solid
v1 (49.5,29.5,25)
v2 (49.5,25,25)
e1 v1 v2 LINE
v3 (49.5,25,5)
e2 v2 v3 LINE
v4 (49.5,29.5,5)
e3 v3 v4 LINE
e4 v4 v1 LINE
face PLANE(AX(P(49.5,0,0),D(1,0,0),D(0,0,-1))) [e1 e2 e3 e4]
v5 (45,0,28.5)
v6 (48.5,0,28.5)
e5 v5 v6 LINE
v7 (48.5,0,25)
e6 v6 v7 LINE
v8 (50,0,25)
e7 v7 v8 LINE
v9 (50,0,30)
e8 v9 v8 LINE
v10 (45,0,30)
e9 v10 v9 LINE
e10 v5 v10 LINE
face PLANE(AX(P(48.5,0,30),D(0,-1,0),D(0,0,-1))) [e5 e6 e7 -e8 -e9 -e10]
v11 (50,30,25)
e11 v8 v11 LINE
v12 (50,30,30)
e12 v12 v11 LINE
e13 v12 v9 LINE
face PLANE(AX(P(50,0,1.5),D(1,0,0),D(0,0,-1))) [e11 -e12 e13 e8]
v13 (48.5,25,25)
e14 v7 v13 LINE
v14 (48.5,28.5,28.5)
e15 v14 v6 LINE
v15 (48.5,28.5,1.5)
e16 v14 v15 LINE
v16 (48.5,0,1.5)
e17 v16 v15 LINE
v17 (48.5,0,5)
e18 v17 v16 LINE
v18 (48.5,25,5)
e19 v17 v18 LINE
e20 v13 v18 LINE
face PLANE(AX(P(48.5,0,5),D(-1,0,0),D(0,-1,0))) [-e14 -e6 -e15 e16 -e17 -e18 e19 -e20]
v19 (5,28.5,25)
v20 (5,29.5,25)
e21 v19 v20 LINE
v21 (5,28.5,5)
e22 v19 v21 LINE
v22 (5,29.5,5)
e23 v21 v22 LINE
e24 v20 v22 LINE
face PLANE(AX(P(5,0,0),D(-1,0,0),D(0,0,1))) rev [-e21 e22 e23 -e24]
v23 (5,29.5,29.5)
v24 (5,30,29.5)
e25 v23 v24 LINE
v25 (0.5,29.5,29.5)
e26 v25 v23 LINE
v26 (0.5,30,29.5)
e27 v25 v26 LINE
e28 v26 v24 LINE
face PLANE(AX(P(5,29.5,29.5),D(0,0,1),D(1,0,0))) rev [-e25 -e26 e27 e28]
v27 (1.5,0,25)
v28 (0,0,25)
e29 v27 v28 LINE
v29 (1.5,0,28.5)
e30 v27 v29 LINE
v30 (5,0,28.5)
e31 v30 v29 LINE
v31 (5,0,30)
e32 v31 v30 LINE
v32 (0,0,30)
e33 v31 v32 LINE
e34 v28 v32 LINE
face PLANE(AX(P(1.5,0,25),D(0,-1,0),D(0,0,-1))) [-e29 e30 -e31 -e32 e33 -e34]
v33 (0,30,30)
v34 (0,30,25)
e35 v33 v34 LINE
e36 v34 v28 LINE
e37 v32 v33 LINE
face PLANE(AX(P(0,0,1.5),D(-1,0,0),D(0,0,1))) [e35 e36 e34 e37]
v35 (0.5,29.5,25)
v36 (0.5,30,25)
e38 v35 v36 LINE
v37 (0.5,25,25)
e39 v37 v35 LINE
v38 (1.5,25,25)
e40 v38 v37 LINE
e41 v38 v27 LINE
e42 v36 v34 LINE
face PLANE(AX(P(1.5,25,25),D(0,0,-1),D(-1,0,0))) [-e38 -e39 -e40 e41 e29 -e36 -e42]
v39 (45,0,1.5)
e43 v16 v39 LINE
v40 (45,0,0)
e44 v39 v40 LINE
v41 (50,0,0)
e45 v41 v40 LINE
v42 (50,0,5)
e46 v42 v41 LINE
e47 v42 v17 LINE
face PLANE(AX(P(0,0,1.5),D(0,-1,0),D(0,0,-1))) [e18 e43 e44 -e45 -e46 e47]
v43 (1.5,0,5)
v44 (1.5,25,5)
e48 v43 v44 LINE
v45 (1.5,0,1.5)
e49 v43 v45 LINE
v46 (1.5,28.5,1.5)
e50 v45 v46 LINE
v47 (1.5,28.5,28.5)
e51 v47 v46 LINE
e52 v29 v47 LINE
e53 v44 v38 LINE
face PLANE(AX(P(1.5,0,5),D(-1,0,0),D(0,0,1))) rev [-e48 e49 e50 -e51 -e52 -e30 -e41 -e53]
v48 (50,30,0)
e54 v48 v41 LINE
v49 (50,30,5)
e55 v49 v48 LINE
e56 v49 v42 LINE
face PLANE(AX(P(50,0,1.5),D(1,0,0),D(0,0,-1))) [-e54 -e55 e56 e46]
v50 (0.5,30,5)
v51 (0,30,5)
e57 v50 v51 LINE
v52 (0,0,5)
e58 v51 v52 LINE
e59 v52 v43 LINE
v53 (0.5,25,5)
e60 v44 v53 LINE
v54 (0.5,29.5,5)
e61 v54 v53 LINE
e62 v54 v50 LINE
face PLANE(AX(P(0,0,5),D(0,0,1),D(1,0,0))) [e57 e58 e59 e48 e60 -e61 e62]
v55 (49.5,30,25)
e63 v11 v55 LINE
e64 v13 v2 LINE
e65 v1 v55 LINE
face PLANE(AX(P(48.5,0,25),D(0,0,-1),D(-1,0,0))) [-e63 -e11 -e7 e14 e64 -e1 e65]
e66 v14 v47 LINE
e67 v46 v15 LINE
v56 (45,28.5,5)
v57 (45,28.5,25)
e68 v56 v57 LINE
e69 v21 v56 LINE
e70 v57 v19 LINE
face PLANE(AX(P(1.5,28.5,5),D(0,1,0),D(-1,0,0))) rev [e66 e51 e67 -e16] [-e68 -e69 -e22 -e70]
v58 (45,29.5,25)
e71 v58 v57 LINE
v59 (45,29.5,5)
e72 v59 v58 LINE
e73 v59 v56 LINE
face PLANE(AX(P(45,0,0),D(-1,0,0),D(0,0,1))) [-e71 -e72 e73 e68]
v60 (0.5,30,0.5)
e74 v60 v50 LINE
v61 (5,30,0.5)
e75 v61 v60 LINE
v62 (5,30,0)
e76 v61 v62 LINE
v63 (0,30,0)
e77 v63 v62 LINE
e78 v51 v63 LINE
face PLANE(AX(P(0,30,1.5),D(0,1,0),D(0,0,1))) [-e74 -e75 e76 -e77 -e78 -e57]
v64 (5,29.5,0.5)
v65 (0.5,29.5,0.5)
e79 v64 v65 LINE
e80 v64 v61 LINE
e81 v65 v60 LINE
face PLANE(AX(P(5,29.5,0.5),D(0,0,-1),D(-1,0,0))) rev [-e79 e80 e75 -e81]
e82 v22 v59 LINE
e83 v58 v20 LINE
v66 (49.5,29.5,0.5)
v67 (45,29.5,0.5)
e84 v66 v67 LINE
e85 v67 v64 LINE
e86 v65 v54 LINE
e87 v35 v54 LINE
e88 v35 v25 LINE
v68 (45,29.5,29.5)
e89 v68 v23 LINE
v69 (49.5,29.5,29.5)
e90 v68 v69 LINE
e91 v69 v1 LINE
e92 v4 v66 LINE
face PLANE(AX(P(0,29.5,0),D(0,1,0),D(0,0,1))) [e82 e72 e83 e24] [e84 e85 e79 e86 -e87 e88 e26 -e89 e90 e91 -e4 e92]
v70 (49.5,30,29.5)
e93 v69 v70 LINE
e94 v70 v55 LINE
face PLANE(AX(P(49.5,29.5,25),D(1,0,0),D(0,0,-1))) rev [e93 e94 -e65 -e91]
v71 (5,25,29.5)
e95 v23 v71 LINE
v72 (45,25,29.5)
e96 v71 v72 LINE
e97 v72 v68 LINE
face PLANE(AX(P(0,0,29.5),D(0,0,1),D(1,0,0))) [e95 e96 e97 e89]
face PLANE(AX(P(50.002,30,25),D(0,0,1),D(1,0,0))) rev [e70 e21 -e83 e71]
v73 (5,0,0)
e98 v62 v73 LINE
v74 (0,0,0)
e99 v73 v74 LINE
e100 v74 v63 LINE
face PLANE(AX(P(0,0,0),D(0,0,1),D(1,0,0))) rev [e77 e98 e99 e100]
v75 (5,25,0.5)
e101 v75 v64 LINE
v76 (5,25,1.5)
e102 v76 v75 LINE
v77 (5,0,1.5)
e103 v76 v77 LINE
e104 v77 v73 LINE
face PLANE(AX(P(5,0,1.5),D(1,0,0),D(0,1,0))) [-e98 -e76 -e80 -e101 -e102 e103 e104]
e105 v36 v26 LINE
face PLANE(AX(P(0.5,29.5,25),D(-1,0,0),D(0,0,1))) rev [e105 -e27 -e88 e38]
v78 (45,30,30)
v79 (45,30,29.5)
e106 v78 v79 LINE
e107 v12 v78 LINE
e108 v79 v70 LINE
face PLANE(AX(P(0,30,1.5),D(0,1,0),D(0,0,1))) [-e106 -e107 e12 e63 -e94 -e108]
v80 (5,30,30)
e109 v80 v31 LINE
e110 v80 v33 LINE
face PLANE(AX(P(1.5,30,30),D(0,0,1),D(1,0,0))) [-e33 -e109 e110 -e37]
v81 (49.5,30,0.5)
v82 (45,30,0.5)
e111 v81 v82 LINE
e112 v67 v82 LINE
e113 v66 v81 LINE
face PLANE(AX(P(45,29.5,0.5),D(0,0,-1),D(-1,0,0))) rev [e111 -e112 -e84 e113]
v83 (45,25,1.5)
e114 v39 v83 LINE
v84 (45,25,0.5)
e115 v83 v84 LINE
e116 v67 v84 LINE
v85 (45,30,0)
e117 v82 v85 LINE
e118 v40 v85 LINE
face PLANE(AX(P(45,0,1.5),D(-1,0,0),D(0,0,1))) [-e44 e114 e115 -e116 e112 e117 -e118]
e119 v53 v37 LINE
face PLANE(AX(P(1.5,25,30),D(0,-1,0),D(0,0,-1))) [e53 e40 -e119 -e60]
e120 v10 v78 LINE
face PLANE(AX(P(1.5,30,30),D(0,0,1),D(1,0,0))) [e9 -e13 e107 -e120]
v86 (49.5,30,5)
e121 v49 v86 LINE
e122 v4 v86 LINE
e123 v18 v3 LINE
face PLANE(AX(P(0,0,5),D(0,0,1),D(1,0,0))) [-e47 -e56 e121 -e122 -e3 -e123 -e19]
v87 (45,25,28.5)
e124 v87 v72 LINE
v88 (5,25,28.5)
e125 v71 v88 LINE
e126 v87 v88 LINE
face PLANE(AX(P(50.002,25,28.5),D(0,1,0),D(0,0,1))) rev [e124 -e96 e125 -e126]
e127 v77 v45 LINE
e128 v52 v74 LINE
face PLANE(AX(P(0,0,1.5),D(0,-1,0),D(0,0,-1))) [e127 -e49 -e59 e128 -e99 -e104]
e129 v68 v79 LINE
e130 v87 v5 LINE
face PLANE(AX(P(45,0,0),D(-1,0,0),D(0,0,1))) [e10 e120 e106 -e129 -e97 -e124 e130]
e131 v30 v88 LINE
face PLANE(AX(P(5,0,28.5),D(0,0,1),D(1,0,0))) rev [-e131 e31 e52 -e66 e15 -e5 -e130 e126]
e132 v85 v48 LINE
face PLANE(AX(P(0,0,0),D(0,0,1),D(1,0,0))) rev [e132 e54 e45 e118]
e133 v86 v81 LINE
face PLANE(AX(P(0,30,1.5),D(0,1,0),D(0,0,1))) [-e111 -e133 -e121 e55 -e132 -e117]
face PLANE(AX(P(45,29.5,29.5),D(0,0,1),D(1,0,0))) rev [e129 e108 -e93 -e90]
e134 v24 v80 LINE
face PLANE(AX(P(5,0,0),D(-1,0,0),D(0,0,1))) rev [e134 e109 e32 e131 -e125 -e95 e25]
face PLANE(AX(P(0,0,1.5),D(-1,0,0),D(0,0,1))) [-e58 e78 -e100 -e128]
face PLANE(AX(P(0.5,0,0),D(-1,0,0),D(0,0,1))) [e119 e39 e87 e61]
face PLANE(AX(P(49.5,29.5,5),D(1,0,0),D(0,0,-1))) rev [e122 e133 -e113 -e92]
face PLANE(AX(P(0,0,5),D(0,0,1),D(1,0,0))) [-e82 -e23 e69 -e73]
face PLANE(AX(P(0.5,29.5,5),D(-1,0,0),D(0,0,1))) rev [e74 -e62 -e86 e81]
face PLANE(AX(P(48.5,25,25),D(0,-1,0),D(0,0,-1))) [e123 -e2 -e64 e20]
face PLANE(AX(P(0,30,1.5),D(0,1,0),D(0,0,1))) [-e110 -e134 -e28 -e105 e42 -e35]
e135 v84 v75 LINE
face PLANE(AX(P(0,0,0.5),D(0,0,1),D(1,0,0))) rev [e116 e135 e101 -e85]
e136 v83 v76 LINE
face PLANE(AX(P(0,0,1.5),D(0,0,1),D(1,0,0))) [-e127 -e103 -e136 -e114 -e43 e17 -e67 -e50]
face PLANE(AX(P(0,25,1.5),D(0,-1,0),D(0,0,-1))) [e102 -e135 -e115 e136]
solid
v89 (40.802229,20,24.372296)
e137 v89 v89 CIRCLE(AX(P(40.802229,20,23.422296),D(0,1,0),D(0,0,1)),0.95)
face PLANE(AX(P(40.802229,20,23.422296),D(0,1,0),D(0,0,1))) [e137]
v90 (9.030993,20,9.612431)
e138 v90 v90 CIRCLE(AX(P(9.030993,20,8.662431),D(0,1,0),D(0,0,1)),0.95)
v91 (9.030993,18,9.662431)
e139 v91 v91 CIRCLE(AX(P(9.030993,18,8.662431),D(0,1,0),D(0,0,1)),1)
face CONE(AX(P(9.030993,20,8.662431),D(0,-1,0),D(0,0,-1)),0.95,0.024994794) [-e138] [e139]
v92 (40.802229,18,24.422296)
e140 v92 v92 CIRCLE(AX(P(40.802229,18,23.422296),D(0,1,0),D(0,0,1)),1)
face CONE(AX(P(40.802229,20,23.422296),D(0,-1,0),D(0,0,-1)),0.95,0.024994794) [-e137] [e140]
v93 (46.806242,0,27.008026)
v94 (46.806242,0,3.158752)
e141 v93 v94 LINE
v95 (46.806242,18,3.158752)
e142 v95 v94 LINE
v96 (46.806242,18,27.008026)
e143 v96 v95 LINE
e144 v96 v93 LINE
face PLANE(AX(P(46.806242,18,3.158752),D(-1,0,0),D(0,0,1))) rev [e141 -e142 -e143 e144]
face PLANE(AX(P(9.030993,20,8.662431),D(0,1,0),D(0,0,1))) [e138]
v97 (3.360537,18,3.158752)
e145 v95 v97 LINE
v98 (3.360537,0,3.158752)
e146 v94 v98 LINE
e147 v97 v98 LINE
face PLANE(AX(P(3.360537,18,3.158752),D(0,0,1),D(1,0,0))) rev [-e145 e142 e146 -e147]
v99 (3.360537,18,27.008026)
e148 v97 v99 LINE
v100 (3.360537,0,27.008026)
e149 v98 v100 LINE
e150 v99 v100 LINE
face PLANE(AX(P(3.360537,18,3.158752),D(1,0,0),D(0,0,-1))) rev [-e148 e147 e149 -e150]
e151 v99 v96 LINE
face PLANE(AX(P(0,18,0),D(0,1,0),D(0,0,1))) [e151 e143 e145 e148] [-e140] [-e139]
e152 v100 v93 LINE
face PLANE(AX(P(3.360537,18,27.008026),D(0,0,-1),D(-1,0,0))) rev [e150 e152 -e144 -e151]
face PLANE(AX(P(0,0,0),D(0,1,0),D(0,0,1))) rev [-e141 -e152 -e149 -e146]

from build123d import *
from OCP.BRepFilletAPI import BRepFilletAPI_MakeChamfer

# Parameters (mm, degrees)
SALIENTE_EXTRUIR1_DEPTH  = 1.5
SALIENTE_EXTRUIR2_DEPTH  = 3.5
CROQUIS3_W               = 25
CROQUIS3_H               = 5
SALIENTE_EXTRUIR3_DEPTH  = 1.5
CROQUIS4_W               = 25
CROQUIS4_H               = 1.5
SALIENTE_EXTRUIR4_DEPTH  = 3.5
CROQUIS5_W               = 5
CROQUIS5_H               = 25
SALIENTE_EXTRUIR5_DEPTH  = 1.5
CROQUIS6_W               = 1.5
CROQUIS6_H               = 28.5
SALIENTE_EXTRUIR6_DEPTH  = 3.5
SALIENTE_EXTRUIR7_DEPTH  = 1.5
SALIENTE_EXTRUIR9_DEPTH  = 3.5
SALIENTE_EXTRUIR10_REACH = 63.847
CROQUIS10_W              = 40
CROQUIS10_H              = 5
CORTAR_EXTRUIR1_DEPTH    = 0.5
CROQUIS11_W              = 5
CROQUIS11_H              = 20
CROQUIS11_W_2            = 40
CROQUIS11_H_2            = 4.5
CROQUIS11_H_3            = 5
CORTAR_EXTRUIR2_DEPTH    = 0.5
CROQUIS12_W              = 40
CROQUIS12_H              = 4.5
CORTAR_EXTRUIR3_DEPTH    = 0.5
CROQUIS13_W              = 20
CROQUIS13_H              = 4.5
CORTAR_EXTRUIR4_DEPTH    = 0.5
CROQUIS14_W              = 20
CROQUIS14_H              = 4.5
CORTAR_EXTRUIR5_DEPTH    = 0.5
CROQUIS16_W              = 4.5
CROQUIS16_H              = 4.5
CORTAR_EXTRUIR8_DEPTH    = 0.5
CROQUIS17_W              = 43.445704927
CROQUIS17_H              = 23.849273722
SALIENTE_EXTRUIR11_DEPTH = 18
CROQUIS19_R              = 1
SALIENTE_EXTRUIR12_DEPTH = 2
CHAFL_N1_SIZE            = 2
CHAFL_N1_SIZE_2          = 0.05


with BuildPart() as part:
    # Croquis1 → Saliente-Extruir1 (new body)
    with BuildSketch(Plane.XY):
        Polygon((0, 30), (0, 0), (5, 0), (5, 25), (45, 25), (45, 0), (50, 0), (50, 30), (5, 30), align=None)
    extrude(amount=SALIENTE_EXTRUIR1_DEPTH)

    # Croquis2 → Saliente-Extruir2 (add)
    with BuildSketch(Plane.XY.offset(1.5)):
        Polygon((0, 0), (1.5, 0), (1.5, 28.5), (48.5, 28.5), (48.5, 0), (50, 0), (50, 28.5), (50, 30), (48.5, 30), (0, 30), align=None)
    extrude(amount=SALIENTE_EXTRUIR2_DEPTH)

    # Croquis3 → Saliente-Extruir3 (add)
    with BuildSketch(Plane.ZY):
        with Locations((17.5, 27.5)):
            Rectangle(CROQUIS3_W, CROQUIS3_H)
    extrude(amount=-SALIENTE_EXTRUIR3_DEPTH)

    # Croquis4 → Saliente-Extruir4 (add)
    with BuildSketch(Plane(origin=(1.5, 0, 0), x_dir=(0, 0, -1), z_dir=(1, 0, 0))):
        with Locations((-17.5, 29.25)):
            Rectangle(CROQUIS4_W, CROQUIS4_H)
    extrude(amount=SALIENTE_EXTRUIR4_DEPTH)

    # Croquis5 → Saliente-Extruir5 (add)
    with BuildSketch(Plane.ZY):
        with Locations((27.5, 12.5)):
            Rectangle(CROQUIS5_W, CROQUIS5_H)
    extrude(amount=-SALIENTE_EXTRUIR5_DEPTH)

    # Croquis6 → Saliente-Extruir6 (add)
    with BuildSketch(Plane(origin=(1.5, 0, 0), x_dir=(0, 0, -1), z_dir=(1, 0, 0))):
        with Locations((-29.25, 14.25)):
            Rectangle(CROQUIS6_W, CROQUIS6_H)
    extrude(amount=SALIENTE_EXTRUIR6_DEPTH)

    # Croquis7 → Saliente-Extruir7 (add)
    with BuildSketch(Plane(origin=(50, 0, 0), x_dir=(0, 0, -1), z_dir=(1, 0, 0))):
        Polygon((-5, 30), (-30, 30), (-30, 0), (-25, 0), (-25, 25), (-5, 25), align=None)
    extrude(amount=-SALIENTE_EXTRUIR7_DEPTH)

    # Croquis8 → Saliente-Extruir9 (add)
    with BuildSketch(Plane.ZY.offset(-48.5)):
        Polygon((5, 28.5), (25, 28.5), (28.5, 28.5), (28.5, 0), (30, 0), (30, 30), (5, 30), align=None)
    extrude(amount=SALIENTE_EXTRUIR9_DEPTH)

    # Croquis9 → Saliente-Extruir10 (add, up to next)
    with BuildSketch(Plane(origin=(5, 0, 0), x_dir=(0, 0, -1), z_dir=(1, 0, 0)), mode=Mode.PRIVATE) as saliente_extruir10_sk1:
        Polygon((-28.5, 25), (-30, 25), (-30, 30), (-25, 30), (-25, 28.5), (-28.5, 28.5), align=None)
    saliente_extruir10_tool1 = extrude(saliente_extruir10_sk1.sketch, amount=SALIENTE_EXTRUIR10_REACH, mode=Mode.PRIVATE) - part.part
    add(saliente_extruir10_tool1.solids().sort_by_distance((5, 25.070711, 29.25))[0])

    # Croquis10 → Cortar-Extruir1 (cut)
    with BuildSketch(Plane(origin=(0, 0, 0), x_dir=(-1, 0, 0), z_dir=(0, 0, -1))):
        with Locations((-25, 27.5)):
            Rectangle(CROQUIS10_W, CROQUIS10_H)
    extrude(amount=-CORTAR_EXTRUIR1_DEPTH, mode=Mode.SUBTRACT)

    # Croquis11 → Cortar-Extruir2 (cut)
    with BuildSketch(Plane(origin=(0, 30, 0), x_dir=(1, 0, 0), z_dir=(0, 1, 0))):
        with Locations((2.5, -15)):
            Rectangle(CROQUIS11_W, CROQUIS11_H)
        with Locations((25, -2.75)):
            Rectangle(CROQUIS11_W_2, CROQUIS11_H_2)
        with Locations((25, -27.5)):
            Rectangle(CROQUIS11_W_2, CROQUIS11_H_3)
        with Locations((47.5, -15)):
            Rectangle(CROQUIS11_W, CROQUIS11_H)
    extrude(amount=-CORTAR_EXTRUIR2_DEPTH, mode=Mode.SUBTRACT)

    # Croquis12 → Cortar-Extruir3 (cut)
    with BuildSketch(Plane.XY.offset(30)):
        with Locations((25, 27.25)):
            Rectangle(CROQUIS12_W, CROQUIS12_H)
    extrude(amount=-CORTAR_EXTRUIR3_DEPTH, mode=Mode.SUBTRACT)

    # Croquis13 → Cortar-Extruir4 (cut)
    with BuildSketch(Plane(origin=(50, 0, 0), x_dir=(0, 0, -1), z_dir=(1, 0, 0))):
        with Locations((-15, 27.25)):
            Rectangle(CROQUIS13_W, CROQUIS13_H)
    extrude(amount=-CORTAR_EXTRUIR4_DEPTH, mode=Mode.SUBTRACT)

    # Croquis14 → Cortar-Extruir5 (cut)
    with BuildSketch(Plane.ZY):
        with Locations((15, 27.25)):
            Rectangle(CROQUIS14_W, CROQUIS14_H)
    extrude(amount=-CORTAR_EXTRUIR5_DEPTH, mode=Mode.SUBTRACT)

    # Croquis16 → Cortar-Extruir8 (cut)
    with BuildSketch(Plane(origin=(0, 30, 0), x_dir=(1, 0, 0), z_dir=(0, 1, 0))):
        with Locations((2.75, -2.75)):
            Rectangle(CROQUIS16_W, CROQUIS16_H)
        with Locations((47.25, -2.75)):
            Rectangle(CROQUIS16_W, CROQUIS16_H)
        with Locations((47.25, -27.25)):
            Rectangle(CROQUIS16_W, CROQUIS16_H)
        with Locations((2.75, -27.25)):
            Rectangle(CROQUIS16_W, CROQUIS16_H)
    extrude(amount=-CORTAR_EXTRUIR8_DEPTH, mode=Mode.SUBTRACT)


with BuildPart() as body_2:
    # Croquis17 → Saliente-Extruir11 (new body)
    with BuildSketch(Plane(origin=(0, 0, 0), x_dir=(1, 0, 0), z_dir=(0, 1, 0))):
        with Locations((25.083389069, -15.083389069)):
            Rectangle(CROQUIS17_W, CROQUIS17_H)
    extrude(amount=SALIENTE_EXTRUIR11_DEPTH)

    # Croquis19 → Saliente-Extruir12 (add)
    with BuildSketch(Plane(origin=(0, 18, 0), x_dir=(1, 0, 0), z_dir=(0, 1, 0))):
        with Locations(Location((9.030993295, -8.662430759, 0), (0, 0, 270))):
            Circle(CROQUIS19_R)
        with Locations(Location((40.802228568, -23.422295965, 0), (0, 0, 270))):
            Circle(CROQUIS19_R)
    extrude(amount=SALIENTE_EXTRUIR12_DEPTH)

    # Chaflán1
    chafl_n1_edges_1 = [body_2.edges().sort_by_distance(p)[0] for p in [
        (9.030993295, 20, 7.662430759),
    ]]
    chafl_n1_side_1 = [body_2.faces().sort_by_distance(p)[0] for p in [
        (9.030993295, 19.999, 7.662430759),
    ]]
    chafl_n1_edges_2 = [body_2.edges().sort_by_distance(p)[0] for p in [
        (40.802228568, 20, 22.422295965),
    ]]
    chafl_n1_side_2 = [body_2.faces().sort_by_distance(p)[0] for p in [
        (40.802228568, 19.999, 22.422295965),
    ]]
    chafl_n1 = BRepFilletAPI_MakeChamfer(body_2.part.solid().wrapped)
    for e in chafl_n1_edges_1:
        chafl_n1.Add(CHAFL_N1_SIZE - 0.0001, CHAFL_N1_SIZE_2 - 0.0001, e.wrapped, chafl_n1_side_1[0].wrapped)
    for e in chafl_n1_edges_2:
        chafl_n1.Add(CHAFL_N1_SIZE - 0.0001, CHAFL_N1_SIZE_2 - 0.0001, e.wrapped, chafl_n1_side_2[0].wrapped)
    add(Compound.cast(chafl_n1.Shape()), mode=Mode.REPLACE)  # a hair under: the kernel refuses the full size


solid = Compound([part.part, body_2.part])
